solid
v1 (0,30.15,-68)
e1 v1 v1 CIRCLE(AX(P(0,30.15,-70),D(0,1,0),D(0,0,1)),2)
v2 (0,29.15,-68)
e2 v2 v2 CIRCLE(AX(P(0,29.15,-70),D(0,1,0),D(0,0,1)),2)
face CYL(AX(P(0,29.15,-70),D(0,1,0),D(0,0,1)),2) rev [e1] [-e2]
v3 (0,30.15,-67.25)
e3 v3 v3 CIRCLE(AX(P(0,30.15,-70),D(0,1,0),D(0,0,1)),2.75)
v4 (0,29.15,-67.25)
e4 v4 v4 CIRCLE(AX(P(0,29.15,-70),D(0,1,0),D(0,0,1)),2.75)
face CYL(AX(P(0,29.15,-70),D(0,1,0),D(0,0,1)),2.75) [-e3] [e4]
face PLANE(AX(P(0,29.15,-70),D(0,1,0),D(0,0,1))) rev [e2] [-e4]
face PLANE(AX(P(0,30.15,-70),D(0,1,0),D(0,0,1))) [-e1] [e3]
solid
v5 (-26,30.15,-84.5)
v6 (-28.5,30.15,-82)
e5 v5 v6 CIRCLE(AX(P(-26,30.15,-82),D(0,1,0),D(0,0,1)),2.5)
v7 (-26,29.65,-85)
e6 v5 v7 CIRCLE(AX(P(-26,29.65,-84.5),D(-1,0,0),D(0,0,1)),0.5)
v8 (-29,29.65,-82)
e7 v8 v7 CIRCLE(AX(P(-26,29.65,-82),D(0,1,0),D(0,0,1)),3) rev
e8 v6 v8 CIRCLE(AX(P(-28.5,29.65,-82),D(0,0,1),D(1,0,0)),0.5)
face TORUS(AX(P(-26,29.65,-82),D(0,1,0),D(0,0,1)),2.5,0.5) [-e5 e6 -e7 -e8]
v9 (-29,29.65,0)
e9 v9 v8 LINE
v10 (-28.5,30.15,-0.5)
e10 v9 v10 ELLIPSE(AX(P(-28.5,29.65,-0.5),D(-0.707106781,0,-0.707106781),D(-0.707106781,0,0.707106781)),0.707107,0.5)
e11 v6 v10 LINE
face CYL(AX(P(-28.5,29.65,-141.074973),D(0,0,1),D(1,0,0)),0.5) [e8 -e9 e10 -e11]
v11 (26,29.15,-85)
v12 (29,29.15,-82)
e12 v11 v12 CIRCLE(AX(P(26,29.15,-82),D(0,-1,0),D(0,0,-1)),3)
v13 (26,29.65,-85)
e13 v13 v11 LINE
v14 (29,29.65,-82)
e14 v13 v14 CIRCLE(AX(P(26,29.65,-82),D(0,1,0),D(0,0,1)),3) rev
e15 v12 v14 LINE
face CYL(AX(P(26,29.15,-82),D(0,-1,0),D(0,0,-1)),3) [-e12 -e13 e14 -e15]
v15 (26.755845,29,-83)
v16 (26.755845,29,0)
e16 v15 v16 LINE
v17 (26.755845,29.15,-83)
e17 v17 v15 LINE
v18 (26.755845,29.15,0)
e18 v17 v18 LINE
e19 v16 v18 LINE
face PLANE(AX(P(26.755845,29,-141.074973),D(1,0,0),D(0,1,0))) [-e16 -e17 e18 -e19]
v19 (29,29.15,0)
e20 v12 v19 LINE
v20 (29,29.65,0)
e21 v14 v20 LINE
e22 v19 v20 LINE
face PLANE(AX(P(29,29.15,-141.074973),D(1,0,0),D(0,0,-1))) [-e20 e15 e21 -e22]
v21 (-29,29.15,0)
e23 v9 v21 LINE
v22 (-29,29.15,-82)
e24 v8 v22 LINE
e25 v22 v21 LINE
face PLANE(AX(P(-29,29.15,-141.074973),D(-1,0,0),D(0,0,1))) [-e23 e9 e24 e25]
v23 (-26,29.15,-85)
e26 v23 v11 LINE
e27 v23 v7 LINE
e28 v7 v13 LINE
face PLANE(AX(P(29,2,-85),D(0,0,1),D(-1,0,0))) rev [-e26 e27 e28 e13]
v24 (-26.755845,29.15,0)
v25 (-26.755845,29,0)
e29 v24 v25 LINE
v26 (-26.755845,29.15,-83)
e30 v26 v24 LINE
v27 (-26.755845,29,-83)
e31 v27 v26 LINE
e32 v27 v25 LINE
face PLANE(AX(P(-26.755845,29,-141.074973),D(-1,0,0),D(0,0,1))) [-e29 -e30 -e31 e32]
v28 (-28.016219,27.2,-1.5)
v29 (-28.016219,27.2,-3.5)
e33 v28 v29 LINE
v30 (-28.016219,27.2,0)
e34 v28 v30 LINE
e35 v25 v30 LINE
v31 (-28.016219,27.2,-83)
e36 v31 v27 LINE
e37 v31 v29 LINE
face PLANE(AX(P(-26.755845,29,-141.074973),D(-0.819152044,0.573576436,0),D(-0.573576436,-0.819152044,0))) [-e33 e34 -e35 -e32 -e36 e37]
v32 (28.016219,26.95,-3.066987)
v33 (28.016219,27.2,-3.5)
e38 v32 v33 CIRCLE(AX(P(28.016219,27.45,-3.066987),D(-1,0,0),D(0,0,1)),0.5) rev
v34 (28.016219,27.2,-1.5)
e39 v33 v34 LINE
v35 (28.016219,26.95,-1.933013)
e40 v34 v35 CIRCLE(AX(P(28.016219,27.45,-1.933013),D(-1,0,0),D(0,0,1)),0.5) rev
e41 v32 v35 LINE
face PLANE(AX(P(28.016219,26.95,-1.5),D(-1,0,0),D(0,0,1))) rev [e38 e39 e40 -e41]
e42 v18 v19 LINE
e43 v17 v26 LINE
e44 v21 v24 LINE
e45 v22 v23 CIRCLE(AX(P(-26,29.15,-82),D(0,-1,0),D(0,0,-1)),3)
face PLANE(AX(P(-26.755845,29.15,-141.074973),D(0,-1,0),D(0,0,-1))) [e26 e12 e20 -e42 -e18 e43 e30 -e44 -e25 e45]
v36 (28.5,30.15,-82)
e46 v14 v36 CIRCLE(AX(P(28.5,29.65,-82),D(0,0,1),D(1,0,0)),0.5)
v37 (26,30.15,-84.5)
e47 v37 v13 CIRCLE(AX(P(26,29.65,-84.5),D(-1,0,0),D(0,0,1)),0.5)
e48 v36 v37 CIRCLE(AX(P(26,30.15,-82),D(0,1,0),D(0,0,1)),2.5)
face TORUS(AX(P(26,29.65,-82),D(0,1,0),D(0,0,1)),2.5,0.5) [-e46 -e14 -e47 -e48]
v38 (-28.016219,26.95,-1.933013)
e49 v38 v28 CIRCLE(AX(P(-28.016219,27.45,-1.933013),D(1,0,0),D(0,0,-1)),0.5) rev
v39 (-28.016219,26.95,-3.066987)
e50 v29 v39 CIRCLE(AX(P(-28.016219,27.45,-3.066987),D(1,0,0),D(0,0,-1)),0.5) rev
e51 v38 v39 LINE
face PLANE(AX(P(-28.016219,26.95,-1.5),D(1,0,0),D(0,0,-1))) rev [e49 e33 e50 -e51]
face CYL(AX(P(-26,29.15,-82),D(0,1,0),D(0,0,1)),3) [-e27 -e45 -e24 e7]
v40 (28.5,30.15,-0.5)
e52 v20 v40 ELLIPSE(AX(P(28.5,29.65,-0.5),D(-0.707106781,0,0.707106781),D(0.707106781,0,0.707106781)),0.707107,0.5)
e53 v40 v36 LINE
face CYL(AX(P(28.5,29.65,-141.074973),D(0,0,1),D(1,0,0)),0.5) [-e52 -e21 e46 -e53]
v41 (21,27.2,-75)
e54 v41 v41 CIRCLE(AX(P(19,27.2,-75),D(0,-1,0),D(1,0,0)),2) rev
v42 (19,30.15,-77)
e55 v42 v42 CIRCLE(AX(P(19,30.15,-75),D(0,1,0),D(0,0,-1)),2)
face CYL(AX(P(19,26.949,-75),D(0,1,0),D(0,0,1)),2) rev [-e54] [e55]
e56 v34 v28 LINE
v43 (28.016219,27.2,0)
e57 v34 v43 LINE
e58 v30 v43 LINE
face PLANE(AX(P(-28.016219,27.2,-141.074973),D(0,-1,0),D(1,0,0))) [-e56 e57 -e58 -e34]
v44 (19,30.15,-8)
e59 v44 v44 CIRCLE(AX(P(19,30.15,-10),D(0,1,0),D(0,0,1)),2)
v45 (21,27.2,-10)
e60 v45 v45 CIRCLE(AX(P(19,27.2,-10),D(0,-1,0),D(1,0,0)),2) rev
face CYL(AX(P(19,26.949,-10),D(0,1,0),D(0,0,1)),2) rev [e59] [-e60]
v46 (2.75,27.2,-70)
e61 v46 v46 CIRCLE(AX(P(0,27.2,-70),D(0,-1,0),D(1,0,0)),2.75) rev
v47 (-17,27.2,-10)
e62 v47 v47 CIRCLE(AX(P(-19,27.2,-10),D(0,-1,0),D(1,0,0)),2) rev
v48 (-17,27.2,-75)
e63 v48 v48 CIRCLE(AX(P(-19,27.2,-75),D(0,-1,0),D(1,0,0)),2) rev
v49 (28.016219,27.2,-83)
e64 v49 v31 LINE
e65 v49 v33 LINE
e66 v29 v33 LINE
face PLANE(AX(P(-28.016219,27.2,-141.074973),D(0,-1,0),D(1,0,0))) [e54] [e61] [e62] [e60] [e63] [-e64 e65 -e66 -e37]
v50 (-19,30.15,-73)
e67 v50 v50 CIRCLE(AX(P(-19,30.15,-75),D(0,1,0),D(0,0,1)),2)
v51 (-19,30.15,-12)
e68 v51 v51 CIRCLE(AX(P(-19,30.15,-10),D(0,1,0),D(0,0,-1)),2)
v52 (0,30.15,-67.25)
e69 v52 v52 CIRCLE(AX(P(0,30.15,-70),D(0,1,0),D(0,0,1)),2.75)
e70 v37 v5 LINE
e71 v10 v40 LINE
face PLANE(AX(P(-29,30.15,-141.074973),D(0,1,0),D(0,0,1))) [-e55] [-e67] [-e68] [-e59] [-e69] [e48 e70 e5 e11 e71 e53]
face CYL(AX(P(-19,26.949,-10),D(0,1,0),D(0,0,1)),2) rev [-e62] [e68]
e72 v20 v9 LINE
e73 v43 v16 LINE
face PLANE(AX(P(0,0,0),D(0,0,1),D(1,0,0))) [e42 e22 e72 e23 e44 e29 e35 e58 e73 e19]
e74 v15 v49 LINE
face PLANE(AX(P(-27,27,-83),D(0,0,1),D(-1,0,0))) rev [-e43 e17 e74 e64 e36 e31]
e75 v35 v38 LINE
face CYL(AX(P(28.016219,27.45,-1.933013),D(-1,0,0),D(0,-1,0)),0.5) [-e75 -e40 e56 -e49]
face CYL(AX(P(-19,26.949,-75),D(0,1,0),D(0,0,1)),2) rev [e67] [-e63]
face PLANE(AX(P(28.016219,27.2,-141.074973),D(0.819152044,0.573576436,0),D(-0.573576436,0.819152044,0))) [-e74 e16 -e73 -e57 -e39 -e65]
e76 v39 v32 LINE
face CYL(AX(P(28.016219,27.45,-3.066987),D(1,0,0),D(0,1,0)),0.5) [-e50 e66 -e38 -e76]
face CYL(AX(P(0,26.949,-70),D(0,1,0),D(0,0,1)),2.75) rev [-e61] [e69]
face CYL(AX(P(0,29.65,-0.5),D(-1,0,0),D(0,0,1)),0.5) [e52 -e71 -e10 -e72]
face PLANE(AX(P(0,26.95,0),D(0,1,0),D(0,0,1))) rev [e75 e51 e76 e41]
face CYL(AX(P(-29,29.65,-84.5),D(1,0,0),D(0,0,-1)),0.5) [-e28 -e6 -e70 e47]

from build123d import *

# Parameters (mm, degrees)
BOSS_EXTRUDE1_DEPTH = 83
SKETCH3_W           = 58
SKETCH3_H           = 1
BOSS_EXTRUDE2_DEPTH = 2
FILLET1_R           = 3
SKETCH4_W           = 56.032437302
SKETCH4_H           = 2
BOSS_EXTRUDE3_DEPTH = 0.25
FILLET2_R           = 0.5
CUT_EXTRUDE1_REACH  = 91.868
SKETCH5_R           = 2.75
SKETCH6_R           = 2.75
SKETCH6_R_2         = 2
BOSS_EXTRUDE4_DEPTH = 1
SKETCH7_R           = 2
CUT_EXTRUDE2_DEPTH  = 2.95
FILLET3_R           = 0.5


with BuildPart() as part:
    # Sketch1 → Boss-Extrude1 (new body)
    with BuildSketch(Plane.XY):
        Polygon((-26.755845082, 29), (-28.016218651, 27.2), (28.016218651, 27.2), (26.755845082, 29), (26.755845082, 29.15), (29, 29.15), (29, 30.15), (-29, 30.15), (-29, 29.15), (-26.755845082, 29.15), align=None)
    extrude(amount=-BOSS_EXTRUDE1_DEPTH)

    # Sketch3 → Boss-Extrude2 (add)
    with BuildSketch(Plane(origin=(0, 0, -83), x_dir=(-1, 0, 0), z_dir=(0, 0, -1))):
        with Locations((0, 29.65)):
            Rectangle(SKETCH3_W, SKETCH3_H)
    extrude(amount=BOSS_EXTRUDE2_DEPTH)

    # Fillet1
    fillet1_edges = [part.edges().sort_by_distance(p)[0] for p in [
        (-29, 29.65, -85),
        (29, 29.65, -85),
    ]]
    fillet(fillet1_edges, radius=FILLET1_R)

    # Sketch4 → Boss-Extrude3 (add)
    with BuildSketch(Plane.XZ.offset(-27.2)):
        with Locations((0, -2.5)):
            Rectangle(SKETCH4_W, SKETCH4_H)
    extrude(amount=BOSS_EXTRUDE3_DEPTH)

    # Fillet2
    # the kernel refuses this fillet: 0.5 mm, written as the material it takes off along each edge
    with BuildSketch(Plane(origin=(-29.098750406, 26.95, -3.5), x_dir=(0, 1, 0), z_dir=(1, 0, 0)), Plane(origin=(29.098750406, 26.95, -1.5), x_dir=(0, 1, 0), z_dir=(-1, 0, 0))) as fillet2_piece_1:
        with BuildLine():
            CenterArc((0.5, 0.433012702), FILLET2_R, 180, 60)
            Line((0, 0.433012702), (-0.01, 0.433012702))
            Line((-0.01, 0.433012702), (-0.01, 0))
            Line((-0.01, 0), (0, -0.01))
            ThreePointArc((0, -0.01), (0.125, -0.01), (0.245, -0.008660254))
            Line((0.245, -0.008660254), (0.25, 0))
        make_face()
    extrude(amount=58.197500812, mode=Mode.SUBTRACT)

    # Sketch5 → Cut-Extrude1 (cut, up to next)
    with BuildSketch(Plane(origin=(0, 30.15, 0), x_dir=(1, 0, 0), z_dir=(0, 1, 0)), mode=Mode.PRIVATE) as cut_extrude1_sk1:
        with Locations(Location((0, 70, 0), (0, 0, 270))):
            Circle(SKETCH5_R)
    cut_extrude1_tool1 = extrude(cut_extrude1_sk1.sketch, amount=-CUT_EXTRUDE1_REACH, mode=Mode.PRIVATE) & part.part
    add(cut_extrude1_tool1.solids().sort_by_distance((0, 30.15, -70))[0], mode=Mode.SUBTRACT)

    # Sketch7 → Cut-Extrude2 (cut)
    with BuildSketch(Plane(origin=(0, 30.15, 0), x_dir=(1, 0, 0), z_dir=(0, 1, 0))):
        with Locations(Location((19, 10, 0), (0, 0, 270))):
            Circle(SKETCH7_R)
        with Locations((19, 75)):
            Circle(SKETCH7_R)
        with Locations(Location((-19, 75, 0), (0, 0, 270))):
            Circle(SKETCH7_R)
        with Locations((-19, 10)):
            Circle(SKETCH7_R)
    extrude(amount=-CUT_EXTRUDE2_DEPTH, mode=Mode.SUBTRACT)

    # Fillet3
    fillet3_edges = [part.edges().sort_by_distance(p)[0] for p in [
        (0, 30.15, 0),
        (29, 30.15, -41),
        (0, 30.15, -85),
        (-29, 30.15, -41),
        (-28.121320344, 30.15, -84.121320344),
        (28.121320344, 30.15, -84.121320344),
    ]]
    fillet(fillet3_edges, radius=FILLET3_R)


with BuildPart() as body_2:
    # Sketch6 → Boss-Extrude4 (new body)
    with BuildSketch(Plane(origin=(0, 30.15, 0), x_dir=(1, 0, 0), z_dir=(0, 1, 0))):
        with Locations(Location((0, 70, 0), (0, 0, 270))):
            Circle(SKETCH6_R)
        with Locations(Location((0, 70, 0), (0, 0, 270))):
            Circle(SKETCH6_R_2, mode=Mode.SUBTRACT)
    extrude(amount=-BOSS_EXTRUDE4_DEPTH)


solid = Compound([part.part, body_2.part])
